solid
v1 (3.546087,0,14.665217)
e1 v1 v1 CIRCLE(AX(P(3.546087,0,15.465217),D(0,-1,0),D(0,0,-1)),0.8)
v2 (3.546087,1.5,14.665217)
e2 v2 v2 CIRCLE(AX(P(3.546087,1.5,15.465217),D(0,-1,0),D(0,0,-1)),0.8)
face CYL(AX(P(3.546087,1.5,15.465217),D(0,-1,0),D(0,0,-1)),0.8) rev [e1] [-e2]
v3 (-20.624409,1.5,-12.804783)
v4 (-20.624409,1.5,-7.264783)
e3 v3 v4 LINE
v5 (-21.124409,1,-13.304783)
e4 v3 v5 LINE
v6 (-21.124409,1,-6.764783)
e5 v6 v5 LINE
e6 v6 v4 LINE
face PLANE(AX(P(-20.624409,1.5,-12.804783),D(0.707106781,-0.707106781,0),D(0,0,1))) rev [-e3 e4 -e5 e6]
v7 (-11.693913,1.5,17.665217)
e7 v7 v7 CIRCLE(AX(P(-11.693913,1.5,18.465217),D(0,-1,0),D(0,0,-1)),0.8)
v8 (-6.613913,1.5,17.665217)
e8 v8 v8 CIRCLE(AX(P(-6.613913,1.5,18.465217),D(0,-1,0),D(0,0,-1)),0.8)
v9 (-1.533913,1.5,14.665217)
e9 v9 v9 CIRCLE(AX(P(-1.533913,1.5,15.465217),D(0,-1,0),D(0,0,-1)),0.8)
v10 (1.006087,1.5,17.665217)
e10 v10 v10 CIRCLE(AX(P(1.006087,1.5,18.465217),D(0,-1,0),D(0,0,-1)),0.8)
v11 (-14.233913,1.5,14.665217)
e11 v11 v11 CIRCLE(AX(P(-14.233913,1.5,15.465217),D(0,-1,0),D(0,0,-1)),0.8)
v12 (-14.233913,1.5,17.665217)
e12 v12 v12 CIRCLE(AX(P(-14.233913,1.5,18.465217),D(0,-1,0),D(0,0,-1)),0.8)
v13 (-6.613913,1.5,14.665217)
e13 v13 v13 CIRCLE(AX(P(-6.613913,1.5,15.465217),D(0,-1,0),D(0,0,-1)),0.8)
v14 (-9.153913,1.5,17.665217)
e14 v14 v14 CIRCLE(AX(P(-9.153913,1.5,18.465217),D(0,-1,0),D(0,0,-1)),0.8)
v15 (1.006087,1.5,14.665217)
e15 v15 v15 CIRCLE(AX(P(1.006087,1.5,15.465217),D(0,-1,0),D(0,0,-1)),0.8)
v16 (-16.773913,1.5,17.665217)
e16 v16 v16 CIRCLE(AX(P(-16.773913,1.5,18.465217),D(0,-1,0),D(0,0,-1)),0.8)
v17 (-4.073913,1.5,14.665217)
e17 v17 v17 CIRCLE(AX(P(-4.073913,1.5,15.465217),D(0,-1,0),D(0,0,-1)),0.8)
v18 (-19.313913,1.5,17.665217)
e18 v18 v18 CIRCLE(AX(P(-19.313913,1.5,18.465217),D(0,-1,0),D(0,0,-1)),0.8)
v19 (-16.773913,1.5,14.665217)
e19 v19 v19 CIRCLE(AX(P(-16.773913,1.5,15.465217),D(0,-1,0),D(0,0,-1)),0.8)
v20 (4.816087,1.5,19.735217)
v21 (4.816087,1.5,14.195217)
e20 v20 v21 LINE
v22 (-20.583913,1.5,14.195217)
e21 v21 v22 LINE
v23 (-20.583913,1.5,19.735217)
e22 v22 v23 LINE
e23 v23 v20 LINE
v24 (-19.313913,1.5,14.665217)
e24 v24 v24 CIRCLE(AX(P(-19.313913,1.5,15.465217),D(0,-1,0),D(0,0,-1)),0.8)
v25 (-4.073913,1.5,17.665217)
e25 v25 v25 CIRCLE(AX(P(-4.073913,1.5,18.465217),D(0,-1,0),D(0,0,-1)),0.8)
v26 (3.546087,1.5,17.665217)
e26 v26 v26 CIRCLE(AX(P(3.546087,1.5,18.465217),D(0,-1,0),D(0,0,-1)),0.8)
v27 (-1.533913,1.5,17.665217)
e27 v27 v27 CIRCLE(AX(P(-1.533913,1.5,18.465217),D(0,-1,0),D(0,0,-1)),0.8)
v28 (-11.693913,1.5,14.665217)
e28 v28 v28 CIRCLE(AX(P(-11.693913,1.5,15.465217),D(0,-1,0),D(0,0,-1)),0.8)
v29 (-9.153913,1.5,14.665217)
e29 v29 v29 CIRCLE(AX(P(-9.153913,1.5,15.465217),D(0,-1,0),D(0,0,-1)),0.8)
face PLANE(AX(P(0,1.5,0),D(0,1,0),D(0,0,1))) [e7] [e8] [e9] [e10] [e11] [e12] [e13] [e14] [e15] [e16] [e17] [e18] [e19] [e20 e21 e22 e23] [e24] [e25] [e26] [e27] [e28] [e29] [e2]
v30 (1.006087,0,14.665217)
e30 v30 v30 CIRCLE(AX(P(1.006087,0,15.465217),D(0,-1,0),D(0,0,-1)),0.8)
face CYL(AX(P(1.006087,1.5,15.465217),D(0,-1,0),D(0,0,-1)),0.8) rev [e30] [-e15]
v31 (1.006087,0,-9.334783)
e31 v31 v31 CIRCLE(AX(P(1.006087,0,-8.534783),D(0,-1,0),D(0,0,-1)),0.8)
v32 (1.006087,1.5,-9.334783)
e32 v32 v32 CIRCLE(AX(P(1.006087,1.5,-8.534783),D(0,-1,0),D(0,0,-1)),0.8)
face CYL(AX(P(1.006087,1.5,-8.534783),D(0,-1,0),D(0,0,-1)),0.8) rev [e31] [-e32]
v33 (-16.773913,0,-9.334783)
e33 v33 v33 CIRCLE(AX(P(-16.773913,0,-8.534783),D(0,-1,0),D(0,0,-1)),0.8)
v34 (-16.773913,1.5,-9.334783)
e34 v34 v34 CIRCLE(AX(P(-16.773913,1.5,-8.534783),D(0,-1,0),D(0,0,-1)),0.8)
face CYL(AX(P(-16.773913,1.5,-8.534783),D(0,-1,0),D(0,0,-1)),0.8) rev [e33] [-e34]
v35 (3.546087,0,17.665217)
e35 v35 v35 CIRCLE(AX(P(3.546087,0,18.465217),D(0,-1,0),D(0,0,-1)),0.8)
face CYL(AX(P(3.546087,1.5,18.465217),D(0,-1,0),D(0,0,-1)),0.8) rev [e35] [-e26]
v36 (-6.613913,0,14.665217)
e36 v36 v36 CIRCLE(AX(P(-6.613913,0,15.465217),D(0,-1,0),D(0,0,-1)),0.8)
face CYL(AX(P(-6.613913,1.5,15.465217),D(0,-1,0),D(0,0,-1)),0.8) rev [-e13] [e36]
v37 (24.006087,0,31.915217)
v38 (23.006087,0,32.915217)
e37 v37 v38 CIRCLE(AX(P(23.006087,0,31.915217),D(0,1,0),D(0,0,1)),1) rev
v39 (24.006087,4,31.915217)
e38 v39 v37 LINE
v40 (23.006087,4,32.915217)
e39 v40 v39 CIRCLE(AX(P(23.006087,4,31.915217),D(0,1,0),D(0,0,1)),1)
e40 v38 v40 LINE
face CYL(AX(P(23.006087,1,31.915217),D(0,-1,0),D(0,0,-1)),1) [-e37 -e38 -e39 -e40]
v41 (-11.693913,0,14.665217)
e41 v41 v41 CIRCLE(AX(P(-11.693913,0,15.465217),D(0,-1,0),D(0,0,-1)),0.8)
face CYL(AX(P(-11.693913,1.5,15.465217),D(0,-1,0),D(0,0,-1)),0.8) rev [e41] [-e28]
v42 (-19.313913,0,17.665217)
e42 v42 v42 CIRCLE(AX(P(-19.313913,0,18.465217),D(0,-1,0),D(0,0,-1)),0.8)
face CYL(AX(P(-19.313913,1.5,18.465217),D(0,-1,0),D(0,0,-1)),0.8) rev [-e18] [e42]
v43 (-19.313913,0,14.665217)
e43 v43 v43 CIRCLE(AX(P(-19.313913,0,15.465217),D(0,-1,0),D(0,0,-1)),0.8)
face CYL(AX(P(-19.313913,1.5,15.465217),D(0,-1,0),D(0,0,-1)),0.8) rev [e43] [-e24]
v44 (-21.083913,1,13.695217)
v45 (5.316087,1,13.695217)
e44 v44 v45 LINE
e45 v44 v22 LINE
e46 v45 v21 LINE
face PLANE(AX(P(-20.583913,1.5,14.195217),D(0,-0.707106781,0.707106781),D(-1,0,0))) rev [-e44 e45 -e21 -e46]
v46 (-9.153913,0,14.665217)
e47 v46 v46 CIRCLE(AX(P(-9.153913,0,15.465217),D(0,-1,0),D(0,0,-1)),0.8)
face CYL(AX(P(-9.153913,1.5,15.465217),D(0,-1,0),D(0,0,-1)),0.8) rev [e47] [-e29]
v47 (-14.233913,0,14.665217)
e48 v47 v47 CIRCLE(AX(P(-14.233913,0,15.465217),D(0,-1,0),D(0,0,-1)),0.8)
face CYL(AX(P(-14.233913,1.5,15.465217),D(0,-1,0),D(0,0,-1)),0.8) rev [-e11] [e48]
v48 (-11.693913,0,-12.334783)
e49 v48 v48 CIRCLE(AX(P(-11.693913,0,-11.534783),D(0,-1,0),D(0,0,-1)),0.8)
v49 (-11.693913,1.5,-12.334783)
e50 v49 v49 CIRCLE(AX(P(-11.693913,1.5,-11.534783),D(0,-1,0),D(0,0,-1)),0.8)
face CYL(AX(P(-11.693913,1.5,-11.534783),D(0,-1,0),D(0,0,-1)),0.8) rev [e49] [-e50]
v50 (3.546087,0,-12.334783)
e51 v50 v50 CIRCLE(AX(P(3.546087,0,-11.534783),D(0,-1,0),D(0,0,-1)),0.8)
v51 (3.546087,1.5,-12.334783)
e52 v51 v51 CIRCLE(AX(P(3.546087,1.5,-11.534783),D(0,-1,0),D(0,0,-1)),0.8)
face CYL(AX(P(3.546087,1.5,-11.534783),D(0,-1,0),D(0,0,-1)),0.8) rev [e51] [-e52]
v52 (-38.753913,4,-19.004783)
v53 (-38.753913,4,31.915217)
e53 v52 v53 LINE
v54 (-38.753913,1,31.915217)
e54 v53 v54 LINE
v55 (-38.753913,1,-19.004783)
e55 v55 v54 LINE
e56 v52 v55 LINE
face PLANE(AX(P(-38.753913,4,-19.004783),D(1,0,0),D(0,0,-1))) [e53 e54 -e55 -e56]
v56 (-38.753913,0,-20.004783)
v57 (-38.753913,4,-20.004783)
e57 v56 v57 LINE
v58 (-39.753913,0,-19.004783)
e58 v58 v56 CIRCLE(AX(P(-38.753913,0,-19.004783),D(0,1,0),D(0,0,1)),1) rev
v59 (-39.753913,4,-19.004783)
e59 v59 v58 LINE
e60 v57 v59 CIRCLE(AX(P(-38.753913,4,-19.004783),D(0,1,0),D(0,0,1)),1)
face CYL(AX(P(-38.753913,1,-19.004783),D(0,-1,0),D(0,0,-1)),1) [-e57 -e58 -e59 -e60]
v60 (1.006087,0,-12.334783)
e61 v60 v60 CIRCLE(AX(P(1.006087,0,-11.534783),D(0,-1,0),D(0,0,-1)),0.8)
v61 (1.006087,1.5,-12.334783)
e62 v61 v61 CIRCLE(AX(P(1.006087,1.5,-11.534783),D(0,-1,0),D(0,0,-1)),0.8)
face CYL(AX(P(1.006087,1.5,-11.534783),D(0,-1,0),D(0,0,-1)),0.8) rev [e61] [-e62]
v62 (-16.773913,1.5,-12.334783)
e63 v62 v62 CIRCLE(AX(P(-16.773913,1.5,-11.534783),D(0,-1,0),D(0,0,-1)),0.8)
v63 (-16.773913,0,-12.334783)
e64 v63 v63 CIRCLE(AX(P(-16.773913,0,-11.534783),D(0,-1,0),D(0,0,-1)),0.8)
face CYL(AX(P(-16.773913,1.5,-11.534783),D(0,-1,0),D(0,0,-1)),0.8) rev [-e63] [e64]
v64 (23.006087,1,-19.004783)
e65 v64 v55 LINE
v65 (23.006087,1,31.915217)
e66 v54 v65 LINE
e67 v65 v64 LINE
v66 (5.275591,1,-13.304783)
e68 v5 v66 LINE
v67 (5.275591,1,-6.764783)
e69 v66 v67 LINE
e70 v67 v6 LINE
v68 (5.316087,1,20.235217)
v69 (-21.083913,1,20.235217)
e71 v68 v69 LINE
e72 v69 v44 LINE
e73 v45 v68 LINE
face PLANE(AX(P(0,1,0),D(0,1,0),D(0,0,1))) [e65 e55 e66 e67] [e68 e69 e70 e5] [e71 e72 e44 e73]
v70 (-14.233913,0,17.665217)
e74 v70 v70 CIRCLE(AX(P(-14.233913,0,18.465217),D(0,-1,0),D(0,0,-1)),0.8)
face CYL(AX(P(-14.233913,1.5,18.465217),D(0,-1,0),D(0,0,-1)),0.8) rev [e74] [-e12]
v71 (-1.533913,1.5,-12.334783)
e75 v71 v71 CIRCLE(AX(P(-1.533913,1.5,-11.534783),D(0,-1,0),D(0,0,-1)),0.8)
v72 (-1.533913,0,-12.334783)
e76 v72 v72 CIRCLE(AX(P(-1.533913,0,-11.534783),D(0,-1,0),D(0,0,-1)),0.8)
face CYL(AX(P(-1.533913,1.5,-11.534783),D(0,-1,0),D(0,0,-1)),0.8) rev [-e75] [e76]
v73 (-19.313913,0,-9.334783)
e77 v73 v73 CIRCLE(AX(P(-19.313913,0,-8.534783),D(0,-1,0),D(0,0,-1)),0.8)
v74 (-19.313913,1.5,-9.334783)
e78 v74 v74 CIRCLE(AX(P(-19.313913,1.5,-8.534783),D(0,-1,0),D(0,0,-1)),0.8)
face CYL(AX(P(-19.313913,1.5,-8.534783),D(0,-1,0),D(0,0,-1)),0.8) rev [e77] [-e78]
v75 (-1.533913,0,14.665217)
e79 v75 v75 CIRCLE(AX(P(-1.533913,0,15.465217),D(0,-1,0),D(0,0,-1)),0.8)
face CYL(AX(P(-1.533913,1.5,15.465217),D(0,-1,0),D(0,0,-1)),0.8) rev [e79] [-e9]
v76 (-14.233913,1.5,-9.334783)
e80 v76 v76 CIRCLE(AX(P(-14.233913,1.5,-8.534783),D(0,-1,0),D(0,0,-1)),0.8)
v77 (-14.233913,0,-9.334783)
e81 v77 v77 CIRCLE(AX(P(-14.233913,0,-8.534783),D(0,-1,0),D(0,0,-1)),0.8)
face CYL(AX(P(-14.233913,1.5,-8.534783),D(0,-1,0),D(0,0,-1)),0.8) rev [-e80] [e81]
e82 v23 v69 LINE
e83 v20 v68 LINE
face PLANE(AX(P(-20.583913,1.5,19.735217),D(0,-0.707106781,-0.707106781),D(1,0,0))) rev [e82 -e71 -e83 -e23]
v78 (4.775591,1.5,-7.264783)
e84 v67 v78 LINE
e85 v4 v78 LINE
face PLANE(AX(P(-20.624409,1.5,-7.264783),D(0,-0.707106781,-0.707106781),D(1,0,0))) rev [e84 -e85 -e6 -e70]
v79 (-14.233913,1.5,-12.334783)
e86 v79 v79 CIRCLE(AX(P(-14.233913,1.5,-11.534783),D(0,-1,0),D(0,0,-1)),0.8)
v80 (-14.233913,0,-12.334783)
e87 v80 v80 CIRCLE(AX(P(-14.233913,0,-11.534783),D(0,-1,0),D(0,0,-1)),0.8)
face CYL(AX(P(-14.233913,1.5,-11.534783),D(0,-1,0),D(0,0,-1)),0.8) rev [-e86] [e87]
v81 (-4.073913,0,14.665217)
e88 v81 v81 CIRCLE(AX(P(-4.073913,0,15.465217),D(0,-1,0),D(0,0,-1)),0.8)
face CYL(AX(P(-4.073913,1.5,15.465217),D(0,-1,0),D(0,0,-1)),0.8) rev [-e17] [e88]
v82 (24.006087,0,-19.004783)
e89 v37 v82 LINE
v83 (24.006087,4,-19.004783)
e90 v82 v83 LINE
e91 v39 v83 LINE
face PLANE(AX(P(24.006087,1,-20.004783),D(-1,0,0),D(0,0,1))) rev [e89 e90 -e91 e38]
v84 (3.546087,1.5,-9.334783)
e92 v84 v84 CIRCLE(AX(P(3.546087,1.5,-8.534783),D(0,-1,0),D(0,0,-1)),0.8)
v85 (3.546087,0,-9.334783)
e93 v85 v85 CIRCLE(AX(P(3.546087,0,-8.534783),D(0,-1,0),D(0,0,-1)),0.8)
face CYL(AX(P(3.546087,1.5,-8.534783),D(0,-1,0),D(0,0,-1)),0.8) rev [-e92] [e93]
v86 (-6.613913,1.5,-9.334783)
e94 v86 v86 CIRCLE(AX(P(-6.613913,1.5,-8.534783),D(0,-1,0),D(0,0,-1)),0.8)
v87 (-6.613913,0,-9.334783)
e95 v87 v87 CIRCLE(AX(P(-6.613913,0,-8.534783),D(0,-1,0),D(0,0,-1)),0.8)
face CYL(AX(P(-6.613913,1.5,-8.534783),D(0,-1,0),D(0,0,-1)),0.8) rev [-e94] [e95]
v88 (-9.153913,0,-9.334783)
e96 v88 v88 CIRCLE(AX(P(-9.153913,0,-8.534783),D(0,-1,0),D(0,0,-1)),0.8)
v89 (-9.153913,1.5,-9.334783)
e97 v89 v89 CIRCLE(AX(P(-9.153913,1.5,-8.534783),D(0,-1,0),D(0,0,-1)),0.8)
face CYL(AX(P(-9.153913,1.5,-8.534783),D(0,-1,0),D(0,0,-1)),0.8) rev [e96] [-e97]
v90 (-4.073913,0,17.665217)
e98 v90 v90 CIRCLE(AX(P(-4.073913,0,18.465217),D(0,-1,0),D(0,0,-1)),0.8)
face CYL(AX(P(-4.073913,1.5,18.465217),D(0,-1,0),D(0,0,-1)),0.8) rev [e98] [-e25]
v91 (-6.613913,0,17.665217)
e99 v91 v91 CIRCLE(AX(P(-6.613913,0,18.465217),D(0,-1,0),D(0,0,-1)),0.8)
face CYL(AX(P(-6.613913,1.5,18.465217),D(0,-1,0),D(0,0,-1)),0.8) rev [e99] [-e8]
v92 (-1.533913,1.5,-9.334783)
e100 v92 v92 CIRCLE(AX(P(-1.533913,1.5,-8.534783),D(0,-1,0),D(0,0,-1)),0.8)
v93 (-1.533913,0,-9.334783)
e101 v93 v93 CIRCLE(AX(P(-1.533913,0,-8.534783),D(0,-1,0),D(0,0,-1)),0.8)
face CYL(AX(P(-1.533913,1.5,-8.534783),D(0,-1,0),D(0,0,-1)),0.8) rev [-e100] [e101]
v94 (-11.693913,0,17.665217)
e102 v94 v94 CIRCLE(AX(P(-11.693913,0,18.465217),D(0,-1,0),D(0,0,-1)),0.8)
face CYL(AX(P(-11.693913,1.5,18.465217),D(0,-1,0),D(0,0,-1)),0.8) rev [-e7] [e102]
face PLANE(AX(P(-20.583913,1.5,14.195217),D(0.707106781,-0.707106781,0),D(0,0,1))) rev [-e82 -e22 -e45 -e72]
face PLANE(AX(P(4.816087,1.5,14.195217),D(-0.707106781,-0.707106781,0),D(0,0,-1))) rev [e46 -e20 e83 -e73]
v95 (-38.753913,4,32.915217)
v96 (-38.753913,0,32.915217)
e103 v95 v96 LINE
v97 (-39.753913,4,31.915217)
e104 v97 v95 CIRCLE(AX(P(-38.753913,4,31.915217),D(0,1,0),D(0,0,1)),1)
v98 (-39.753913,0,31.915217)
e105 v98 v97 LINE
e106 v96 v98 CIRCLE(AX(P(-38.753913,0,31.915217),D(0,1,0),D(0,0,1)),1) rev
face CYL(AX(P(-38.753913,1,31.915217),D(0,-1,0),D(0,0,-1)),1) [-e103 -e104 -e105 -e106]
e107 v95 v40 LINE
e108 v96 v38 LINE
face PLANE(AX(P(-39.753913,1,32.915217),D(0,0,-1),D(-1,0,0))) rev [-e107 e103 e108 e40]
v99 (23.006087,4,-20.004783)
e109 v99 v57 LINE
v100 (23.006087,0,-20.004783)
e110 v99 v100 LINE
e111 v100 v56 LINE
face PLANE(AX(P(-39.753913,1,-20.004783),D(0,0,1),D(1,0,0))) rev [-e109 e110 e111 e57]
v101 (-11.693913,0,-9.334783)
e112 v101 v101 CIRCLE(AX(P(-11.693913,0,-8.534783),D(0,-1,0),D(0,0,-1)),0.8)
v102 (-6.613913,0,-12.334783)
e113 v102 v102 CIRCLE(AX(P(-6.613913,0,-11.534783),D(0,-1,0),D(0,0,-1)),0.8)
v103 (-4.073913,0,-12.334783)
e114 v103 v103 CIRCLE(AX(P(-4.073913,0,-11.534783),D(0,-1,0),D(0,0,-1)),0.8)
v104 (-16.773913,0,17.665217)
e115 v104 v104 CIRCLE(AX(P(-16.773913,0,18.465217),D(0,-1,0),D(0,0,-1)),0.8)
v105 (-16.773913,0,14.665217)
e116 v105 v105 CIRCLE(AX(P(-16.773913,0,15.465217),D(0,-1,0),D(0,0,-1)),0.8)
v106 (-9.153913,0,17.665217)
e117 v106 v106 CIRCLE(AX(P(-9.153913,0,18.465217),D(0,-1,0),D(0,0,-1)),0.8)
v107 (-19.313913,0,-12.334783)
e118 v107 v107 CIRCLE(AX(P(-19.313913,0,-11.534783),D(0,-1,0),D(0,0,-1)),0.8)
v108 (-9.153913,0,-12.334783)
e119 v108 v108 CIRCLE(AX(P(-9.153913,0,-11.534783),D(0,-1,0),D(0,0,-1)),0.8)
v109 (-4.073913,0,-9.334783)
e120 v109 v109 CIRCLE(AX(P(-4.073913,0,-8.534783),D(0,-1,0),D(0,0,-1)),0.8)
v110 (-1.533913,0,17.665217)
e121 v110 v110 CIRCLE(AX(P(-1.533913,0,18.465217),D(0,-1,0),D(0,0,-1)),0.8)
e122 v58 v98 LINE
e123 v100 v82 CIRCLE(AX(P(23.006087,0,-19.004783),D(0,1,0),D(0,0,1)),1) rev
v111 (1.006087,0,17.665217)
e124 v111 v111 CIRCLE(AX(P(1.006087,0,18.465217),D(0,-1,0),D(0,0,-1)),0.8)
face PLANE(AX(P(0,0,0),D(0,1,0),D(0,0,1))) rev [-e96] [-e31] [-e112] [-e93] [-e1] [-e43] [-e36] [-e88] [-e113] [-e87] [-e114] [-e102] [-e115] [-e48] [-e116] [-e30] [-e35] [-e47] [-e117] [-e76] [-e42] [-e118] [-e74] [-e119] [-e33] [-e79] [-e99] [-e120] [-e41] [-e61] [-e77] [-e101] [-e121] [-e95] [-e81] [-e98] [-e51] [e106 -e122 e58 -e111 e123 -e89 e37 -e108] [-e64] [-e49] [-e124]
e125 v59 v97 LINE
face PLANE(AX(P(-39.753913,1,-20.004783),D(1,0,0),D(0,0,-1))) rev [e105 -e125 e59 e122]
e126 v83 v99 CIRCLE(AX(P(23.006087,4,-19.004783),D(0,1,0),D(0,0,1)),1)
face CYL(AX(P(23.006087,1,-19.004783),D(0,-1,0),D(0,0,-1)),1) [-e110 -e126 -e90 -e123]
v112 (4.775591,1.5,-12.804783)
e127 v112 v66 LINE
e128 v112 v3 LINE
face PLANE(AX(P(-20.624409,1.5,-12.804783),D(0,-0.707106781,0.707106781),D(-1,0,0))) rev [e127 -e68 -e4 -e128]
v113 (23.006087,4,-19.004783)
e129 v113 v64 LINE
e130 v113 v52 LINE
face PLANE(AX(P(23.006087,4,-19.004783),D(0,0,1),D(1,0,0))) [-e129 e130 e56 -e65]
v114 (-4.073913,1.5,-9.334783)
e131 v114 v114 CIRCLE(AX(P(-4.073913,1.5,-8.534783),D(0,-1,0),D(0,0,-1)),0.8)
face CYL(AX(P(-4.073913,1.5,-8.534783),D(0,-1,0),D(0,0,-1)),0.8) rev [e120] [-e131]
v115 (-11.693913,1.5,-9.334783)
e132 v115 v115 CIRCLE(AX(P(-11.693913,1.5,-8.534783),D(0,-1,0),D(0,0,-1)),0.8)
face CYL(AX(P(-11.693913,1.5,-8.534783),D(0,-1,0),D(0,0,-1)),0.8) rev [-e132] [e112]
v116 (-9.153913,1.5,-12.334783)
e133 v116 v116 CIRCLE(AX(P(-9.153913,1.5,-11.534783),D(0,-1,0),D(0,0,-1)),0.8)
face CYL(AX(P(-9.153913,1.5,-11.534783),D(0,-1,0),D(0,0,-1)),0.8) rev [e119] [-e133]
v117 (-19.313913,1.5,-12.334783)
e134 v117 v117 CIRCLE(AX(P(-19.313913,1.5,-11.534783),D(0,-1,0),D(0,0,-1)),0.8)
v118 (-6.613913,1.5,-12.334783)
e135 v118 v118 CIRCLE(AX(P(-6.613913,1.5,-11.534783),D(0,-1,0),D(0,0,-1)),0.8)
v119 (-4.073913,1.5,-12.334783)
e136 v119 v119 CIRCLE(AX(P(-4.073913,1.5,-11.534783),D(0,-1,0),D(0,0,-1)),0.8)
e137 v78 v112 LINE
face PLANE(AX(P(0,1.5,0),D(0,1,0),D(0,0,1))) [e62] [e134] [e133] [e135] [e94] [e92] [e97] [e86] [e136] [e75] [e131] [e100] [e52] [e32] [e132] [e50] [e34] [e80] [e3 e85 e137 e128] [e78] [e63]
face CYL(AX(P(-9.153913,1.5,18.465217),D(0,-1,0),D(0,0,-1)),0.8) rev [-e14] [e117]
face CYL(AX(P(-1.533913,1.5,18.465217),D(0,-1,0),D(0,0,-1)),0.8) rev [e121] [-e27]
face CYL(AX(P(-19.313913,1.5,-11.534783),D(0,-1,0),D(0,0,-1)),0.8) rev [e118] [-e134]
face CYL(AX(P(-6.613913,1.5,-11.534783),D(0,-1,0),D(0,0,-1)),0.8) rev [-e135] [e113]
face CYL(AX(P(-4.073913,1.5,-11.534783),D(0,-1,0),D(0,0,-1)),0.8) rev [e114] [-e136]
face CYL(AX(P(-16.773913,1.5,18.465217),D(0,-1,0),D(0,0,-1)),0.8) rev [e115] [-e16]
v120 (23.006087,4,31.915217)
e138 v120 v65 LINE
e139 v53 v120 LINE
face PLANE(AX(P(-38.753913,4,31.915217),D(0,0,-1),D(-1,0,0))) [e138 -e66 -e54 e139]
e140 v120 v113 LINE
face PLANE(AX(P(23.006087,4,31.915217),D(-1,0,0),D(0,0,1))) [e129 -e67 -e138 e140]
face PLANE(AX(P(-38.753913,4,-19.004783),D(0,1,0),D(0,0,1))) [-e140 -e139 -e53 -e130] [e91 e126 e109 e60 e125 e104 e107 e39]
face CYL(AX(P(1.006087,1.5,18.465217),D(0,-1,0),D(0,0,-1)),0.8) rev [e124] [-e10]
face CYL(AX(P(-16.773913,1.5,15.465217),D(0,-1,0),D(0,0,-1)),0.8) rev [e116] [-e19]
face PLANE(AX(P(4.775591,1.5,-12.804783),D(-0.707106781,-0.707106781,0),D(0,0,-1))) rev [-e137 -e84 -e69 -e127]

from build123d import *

# Parameters (mm, degrees)
SKETCH_1_W          = 63.76
SKETCH_1_H          = 52.92
EXTRUDE_1_DEPTH     = 1
FILLET_1_R          = 1
SKETCH_2_W          = 25.4
SKETCH_2_H          = 5.54
EXTRUDE_2_DEPTH     = 0.5
CHAMFER_1_SIZE      = 0.5
SKETCH_3_R          = 0.8
CUT_EXTRUDE_2_DEPTH = 52.633662839
EXTRUDE_START       = 3
SKETCH_4_W          = 61.76
SKETCH_4_H          = 50.92
EXTRUDE_3_DEPTH     = 3


with BuildPart() as part:
    # 草图1 → 凸台-拉伸1 (new body)
    with BuildSketch(Plane(origin=(0, 0, 0), x_dir=(1, 0, 0), z_dir=(0, 1, 0))):
        with Locations((-7.873913043, -6.455217391)):
            Rectangle(SKETCH_1_W, SKETCH_1_H)
    extrude(amount=EXTRUDE_1_DEPTH)

    # 圆角1
    fillet_1_edges = [part.edges().sort_by_distance(p)[0] for p in [
        (-39.753913043, 0.5, -20.004782609),
        (24.006086957, 0.5, -20.004782609),
        (24.006086957, 0.5, 32.915217391),
        (-39.753913043, 0.5, 32.915217391),
    ]]
    fillet(fillet_1_edges, radius=FILLET_1_R)

    # 草图2 → 凸台-拉伸2 (add)
    with BuildSketch(Plane(origin=(0, 1, 0), x_dir=(1, 0, 0), z_dir=(0, 1, 0))):
        with Locations((-7.924409429, 10.034782609)):
            Rectangle(SKETCH_2_W, SKETCH_2_H)
        with Locations((-7.883913043, -16.965217391)):
            Rectangle(SKETCH_2_W, SKETCH_2_H)
    extrude(amount=EXTRUDE_2_DEPTH)

    # 倒角1
    chamfer_1_edges = [part.edges().sort_by_distance(p)[0] for p in [
        (4.816086957, 1, 16.965217391),
        (-7.883913043, 1, 14.195217391),
        (-7.883913043, 1, 19.735217391),
        (-20.583913043, 1, 16.965217391),
        (-20.624409429, 1, -10.034782609),
        (-7.924409429, 1, -12.804782609),
        (4.775590571, 1, -10.034782609),
        (-7.924409429, 1, -7.264782609),
    ]]
    chamfer(chamfer_1_edges, length=CHAMFER_1_SIZE - 0.0001)  # a hair under: the kernel refuses the full size

    # 草图3 → 切除-拉伸2 (cut, through all)
    with BuildSketch(Plane.XZ):
        with Locations(Location((-19.313913043, 18.465217391, 0), (0, 0, 270))):
            Circle(SKETCH_3_R)
        with Locations(Location((-16.773913043, 18.465217391, 0), (0, 0, 270))):
            Circle(SKETCH_3_R)
        with Locations(Location((-14.233913043, 18.465217391, 0), (0, 0, 270))):
            Circle(SKETCH_3_R)
        with Locations(Location((-11.693913043, 18.465217391, 0), (0, 0, 270))):
            Circle(SKETCH_3_R)
        with Locations(Location((-9.153913043, 18.465217391, 0), (0, 0, 270))):
            Circle(SKETCH_3_R)
        with Locations(Location((-6.613913043, 18.465217391, 0), (0, 0, 270))):
            Circle(SKETCH_3_R)
        with Locations(Location((-4.073913043, 18.465217391, 0), (0, 0, 270))):
            Circle(SKETCH_3_R)
        with Locations(Location((-1.533913043, 18.465217391, 0), (0, 0, 270))):
            Circle(SKETCH_3_R)
        with Locations(Location((1.006086957, 18.465217391, 0), (0, 0, 270))):
            Circle(SKETCH_3_R)
        with Locations(Location((3.546086957, 18.465217391, 0), (0, 0, 270))):
            Circle(SKETCH_3_R)
        with Locations(Location((-16.773913043, 15.465217391, 0), (0, 0, 270))):
            Circle(SKETCH_3_R)
        with Locations(Location((-14.233913043, 15.465217391, 0), (0, 0, 270))):
            Circle(SKETCH_3_R)
        with Locations(Location((-11.693913043, 15.465217391, 0), (0, 0, 270))):
            Circle(SKETCH_3_R)
        with Locations(Location((-9.153913043, 15.465217391, 0), (0, 0, 270))):
            Circle(SKETCH_3_R)
        with Locations(Location((-6.613913043, 15.465217391, 0), (0, 0, 270))):
            Circle(SKETCH_3_R)
        with Locations(Location((-4.073913043, 15.465217391, 0), (0, 0, 270))):
            Circle(SKETCH_3_R)
        with Locations(Location((-1.533913043, 15.465217391, 0), (0, 0, 270))):
            Circle(SKETCH_3_R)
        with Locations(Location((1.006086957, 15.465217391, 0), (0, 0, 270))):
            Circle(SKETCH_3_R)
        with Locations(Location((3.546086957, 15.465217391, 0), (0, 0, 270))):
            Circle(SKETCH_3_R)
        with Locations(Location((-19.313913043, 15.465217391, 0), (0, 0, 270))):
            Circle(SKETCH_3_R)
        with Locations(Location((-19.313913043, -8.534782609, 0), (0, 0, 270))):
            Circle(SKETCH_3_R)
        with Locations(Location((-16.773913043, -8.534782609, 0), (0, 0, 270))):
            Circle(SKETCH_3_R)
        with Locations(Location((-14.233913043, -8.534782609, 0), (0, 0, 270))):
            Circle(SKETCH_3_R)
        with Locations(Location((-11.693913043, -8.534782609, 0), (0, 0, 270))):
            Circle(SKETCH_3_R)
        with Locations(Location((-9.153913043, -8.534782609, 0), (0, 0, 270))):
            Circle(SKETCH_3_R)
        with Locations(Location((-6.613913043, -8.534782609, 0), (0, 0, 270))):
            Circle(SKETCH_3_R)
        with Locations(Location((-4.073913043, -8.534782609, 0), (0, 0, 270))):
            Circle(SKETCH_3_R)
        with Locations(Location((-1.533913043, -8.534782609, 0), (0, 0, 270))):
            Circle(SKETCH_3_R)
        with Locations(Location((1.006086957, -8.534782609, 0), (0, 0, 270))):
            Circle(SKETCH_3_R)
        with Locations(Location((3.546086957, -8.534782609, 0), (0, 0, 270))):
            Circle(SKETCH_3_R)
        with Locations(Location((-16.773913043, -11.534782609, 0), (0, 0, 270))):
            Circle(SKETCH_3_R)
        with Locations(Location((-14.233913043, -11.534782609, 0), (0, 0, 270))):
            Circle(SKETCH_3_R)
        with Locations(Location((-11.693913043, -11.534782609, 0), (0, 0, 270))):
            Circle(SKETCH_3_R)
        with Locations(Location((-9.153913043, -11.534782609, 0), (0, 0, 270))):
            Circle(SKETCH_3_R)
        with Locations(Location((-6.613913043, -11.534782609, 0), (0, 0, 270))):
            Circle(SKETCH_3_R)
        with Locations(Location((-4.073913043, -11.534782609, 0), (0, 0, 270))):
            Circle(SKETCH_3_R)
        with Locations(Location((-1.533913043, -11.534782609, 0), (0, 0, 270))):
            Circle(SKETCH_3_R)
        with Locations(Location((1.006086957, -11.534782609, 0), (0, 0, 270))):
            Circle(SKETCH_3_R)
        with Locations(Location((3.546086957, -11.534782609, 0), (0, 0, 270))):
            Circle(SKETCH_3_R)
        with Locations(Location((-19.313913043, -11.534782609, 0), (0, 0, 270))):
            Circle(SKETCH_3_R)
    extrude(amount=-CUT_EXTRUDE_2_DEPTH, mode=Mode.SUBTRACT)

    # 草图4 → 凸台-拉伸3 (add)
    with BuildSketch(Plane(origin=(0, 1, 0), x_dir=(1, 0, 0), z_dir=(0, 1, 0)).offset(EXTRUDE_START)):
        with BuildLine():
            Line((-38.753913043, -32.915217391), (23.006086957, -32.915217391))
            ThreePointArc((23.006086957, -32.915217391), (23.713193738, -32.622324172), (24.006086957, -31.915217391))
            Line((24.006086957, -31.915217391), (24.006086957, 19.004782609))
            ThreePointArc((24.006086957, 19.004782609), (23.713193738, 19.71188939), (23.006086957, 20.004782609))
            Line((23.006086957, 20.004782609), (-38.753913043, 20.004782609))
            ThreePointArc((-38.753913043, 20.004782609), (-39.461019825, 19.71188939), (-39.753913043, 19.004782609))
            Line((-39.753913043, 19.004782609), (-39.753913043, -31.915217391))
            ThreePointArc((-39.753913043, -31.915217391), (-39.461019825, -32.622324172), (-38.753913043, -32.915217391))
        make_face()
        with Locations((-7.873913043, -6.455217391)):
            Rectangle(SKETCH_4_W, SKETCH_4_H, mode=Mode.SUBTRACT)
    extrude(amount=-EXTRUDE_3_DEPTH)


solid = part.part
